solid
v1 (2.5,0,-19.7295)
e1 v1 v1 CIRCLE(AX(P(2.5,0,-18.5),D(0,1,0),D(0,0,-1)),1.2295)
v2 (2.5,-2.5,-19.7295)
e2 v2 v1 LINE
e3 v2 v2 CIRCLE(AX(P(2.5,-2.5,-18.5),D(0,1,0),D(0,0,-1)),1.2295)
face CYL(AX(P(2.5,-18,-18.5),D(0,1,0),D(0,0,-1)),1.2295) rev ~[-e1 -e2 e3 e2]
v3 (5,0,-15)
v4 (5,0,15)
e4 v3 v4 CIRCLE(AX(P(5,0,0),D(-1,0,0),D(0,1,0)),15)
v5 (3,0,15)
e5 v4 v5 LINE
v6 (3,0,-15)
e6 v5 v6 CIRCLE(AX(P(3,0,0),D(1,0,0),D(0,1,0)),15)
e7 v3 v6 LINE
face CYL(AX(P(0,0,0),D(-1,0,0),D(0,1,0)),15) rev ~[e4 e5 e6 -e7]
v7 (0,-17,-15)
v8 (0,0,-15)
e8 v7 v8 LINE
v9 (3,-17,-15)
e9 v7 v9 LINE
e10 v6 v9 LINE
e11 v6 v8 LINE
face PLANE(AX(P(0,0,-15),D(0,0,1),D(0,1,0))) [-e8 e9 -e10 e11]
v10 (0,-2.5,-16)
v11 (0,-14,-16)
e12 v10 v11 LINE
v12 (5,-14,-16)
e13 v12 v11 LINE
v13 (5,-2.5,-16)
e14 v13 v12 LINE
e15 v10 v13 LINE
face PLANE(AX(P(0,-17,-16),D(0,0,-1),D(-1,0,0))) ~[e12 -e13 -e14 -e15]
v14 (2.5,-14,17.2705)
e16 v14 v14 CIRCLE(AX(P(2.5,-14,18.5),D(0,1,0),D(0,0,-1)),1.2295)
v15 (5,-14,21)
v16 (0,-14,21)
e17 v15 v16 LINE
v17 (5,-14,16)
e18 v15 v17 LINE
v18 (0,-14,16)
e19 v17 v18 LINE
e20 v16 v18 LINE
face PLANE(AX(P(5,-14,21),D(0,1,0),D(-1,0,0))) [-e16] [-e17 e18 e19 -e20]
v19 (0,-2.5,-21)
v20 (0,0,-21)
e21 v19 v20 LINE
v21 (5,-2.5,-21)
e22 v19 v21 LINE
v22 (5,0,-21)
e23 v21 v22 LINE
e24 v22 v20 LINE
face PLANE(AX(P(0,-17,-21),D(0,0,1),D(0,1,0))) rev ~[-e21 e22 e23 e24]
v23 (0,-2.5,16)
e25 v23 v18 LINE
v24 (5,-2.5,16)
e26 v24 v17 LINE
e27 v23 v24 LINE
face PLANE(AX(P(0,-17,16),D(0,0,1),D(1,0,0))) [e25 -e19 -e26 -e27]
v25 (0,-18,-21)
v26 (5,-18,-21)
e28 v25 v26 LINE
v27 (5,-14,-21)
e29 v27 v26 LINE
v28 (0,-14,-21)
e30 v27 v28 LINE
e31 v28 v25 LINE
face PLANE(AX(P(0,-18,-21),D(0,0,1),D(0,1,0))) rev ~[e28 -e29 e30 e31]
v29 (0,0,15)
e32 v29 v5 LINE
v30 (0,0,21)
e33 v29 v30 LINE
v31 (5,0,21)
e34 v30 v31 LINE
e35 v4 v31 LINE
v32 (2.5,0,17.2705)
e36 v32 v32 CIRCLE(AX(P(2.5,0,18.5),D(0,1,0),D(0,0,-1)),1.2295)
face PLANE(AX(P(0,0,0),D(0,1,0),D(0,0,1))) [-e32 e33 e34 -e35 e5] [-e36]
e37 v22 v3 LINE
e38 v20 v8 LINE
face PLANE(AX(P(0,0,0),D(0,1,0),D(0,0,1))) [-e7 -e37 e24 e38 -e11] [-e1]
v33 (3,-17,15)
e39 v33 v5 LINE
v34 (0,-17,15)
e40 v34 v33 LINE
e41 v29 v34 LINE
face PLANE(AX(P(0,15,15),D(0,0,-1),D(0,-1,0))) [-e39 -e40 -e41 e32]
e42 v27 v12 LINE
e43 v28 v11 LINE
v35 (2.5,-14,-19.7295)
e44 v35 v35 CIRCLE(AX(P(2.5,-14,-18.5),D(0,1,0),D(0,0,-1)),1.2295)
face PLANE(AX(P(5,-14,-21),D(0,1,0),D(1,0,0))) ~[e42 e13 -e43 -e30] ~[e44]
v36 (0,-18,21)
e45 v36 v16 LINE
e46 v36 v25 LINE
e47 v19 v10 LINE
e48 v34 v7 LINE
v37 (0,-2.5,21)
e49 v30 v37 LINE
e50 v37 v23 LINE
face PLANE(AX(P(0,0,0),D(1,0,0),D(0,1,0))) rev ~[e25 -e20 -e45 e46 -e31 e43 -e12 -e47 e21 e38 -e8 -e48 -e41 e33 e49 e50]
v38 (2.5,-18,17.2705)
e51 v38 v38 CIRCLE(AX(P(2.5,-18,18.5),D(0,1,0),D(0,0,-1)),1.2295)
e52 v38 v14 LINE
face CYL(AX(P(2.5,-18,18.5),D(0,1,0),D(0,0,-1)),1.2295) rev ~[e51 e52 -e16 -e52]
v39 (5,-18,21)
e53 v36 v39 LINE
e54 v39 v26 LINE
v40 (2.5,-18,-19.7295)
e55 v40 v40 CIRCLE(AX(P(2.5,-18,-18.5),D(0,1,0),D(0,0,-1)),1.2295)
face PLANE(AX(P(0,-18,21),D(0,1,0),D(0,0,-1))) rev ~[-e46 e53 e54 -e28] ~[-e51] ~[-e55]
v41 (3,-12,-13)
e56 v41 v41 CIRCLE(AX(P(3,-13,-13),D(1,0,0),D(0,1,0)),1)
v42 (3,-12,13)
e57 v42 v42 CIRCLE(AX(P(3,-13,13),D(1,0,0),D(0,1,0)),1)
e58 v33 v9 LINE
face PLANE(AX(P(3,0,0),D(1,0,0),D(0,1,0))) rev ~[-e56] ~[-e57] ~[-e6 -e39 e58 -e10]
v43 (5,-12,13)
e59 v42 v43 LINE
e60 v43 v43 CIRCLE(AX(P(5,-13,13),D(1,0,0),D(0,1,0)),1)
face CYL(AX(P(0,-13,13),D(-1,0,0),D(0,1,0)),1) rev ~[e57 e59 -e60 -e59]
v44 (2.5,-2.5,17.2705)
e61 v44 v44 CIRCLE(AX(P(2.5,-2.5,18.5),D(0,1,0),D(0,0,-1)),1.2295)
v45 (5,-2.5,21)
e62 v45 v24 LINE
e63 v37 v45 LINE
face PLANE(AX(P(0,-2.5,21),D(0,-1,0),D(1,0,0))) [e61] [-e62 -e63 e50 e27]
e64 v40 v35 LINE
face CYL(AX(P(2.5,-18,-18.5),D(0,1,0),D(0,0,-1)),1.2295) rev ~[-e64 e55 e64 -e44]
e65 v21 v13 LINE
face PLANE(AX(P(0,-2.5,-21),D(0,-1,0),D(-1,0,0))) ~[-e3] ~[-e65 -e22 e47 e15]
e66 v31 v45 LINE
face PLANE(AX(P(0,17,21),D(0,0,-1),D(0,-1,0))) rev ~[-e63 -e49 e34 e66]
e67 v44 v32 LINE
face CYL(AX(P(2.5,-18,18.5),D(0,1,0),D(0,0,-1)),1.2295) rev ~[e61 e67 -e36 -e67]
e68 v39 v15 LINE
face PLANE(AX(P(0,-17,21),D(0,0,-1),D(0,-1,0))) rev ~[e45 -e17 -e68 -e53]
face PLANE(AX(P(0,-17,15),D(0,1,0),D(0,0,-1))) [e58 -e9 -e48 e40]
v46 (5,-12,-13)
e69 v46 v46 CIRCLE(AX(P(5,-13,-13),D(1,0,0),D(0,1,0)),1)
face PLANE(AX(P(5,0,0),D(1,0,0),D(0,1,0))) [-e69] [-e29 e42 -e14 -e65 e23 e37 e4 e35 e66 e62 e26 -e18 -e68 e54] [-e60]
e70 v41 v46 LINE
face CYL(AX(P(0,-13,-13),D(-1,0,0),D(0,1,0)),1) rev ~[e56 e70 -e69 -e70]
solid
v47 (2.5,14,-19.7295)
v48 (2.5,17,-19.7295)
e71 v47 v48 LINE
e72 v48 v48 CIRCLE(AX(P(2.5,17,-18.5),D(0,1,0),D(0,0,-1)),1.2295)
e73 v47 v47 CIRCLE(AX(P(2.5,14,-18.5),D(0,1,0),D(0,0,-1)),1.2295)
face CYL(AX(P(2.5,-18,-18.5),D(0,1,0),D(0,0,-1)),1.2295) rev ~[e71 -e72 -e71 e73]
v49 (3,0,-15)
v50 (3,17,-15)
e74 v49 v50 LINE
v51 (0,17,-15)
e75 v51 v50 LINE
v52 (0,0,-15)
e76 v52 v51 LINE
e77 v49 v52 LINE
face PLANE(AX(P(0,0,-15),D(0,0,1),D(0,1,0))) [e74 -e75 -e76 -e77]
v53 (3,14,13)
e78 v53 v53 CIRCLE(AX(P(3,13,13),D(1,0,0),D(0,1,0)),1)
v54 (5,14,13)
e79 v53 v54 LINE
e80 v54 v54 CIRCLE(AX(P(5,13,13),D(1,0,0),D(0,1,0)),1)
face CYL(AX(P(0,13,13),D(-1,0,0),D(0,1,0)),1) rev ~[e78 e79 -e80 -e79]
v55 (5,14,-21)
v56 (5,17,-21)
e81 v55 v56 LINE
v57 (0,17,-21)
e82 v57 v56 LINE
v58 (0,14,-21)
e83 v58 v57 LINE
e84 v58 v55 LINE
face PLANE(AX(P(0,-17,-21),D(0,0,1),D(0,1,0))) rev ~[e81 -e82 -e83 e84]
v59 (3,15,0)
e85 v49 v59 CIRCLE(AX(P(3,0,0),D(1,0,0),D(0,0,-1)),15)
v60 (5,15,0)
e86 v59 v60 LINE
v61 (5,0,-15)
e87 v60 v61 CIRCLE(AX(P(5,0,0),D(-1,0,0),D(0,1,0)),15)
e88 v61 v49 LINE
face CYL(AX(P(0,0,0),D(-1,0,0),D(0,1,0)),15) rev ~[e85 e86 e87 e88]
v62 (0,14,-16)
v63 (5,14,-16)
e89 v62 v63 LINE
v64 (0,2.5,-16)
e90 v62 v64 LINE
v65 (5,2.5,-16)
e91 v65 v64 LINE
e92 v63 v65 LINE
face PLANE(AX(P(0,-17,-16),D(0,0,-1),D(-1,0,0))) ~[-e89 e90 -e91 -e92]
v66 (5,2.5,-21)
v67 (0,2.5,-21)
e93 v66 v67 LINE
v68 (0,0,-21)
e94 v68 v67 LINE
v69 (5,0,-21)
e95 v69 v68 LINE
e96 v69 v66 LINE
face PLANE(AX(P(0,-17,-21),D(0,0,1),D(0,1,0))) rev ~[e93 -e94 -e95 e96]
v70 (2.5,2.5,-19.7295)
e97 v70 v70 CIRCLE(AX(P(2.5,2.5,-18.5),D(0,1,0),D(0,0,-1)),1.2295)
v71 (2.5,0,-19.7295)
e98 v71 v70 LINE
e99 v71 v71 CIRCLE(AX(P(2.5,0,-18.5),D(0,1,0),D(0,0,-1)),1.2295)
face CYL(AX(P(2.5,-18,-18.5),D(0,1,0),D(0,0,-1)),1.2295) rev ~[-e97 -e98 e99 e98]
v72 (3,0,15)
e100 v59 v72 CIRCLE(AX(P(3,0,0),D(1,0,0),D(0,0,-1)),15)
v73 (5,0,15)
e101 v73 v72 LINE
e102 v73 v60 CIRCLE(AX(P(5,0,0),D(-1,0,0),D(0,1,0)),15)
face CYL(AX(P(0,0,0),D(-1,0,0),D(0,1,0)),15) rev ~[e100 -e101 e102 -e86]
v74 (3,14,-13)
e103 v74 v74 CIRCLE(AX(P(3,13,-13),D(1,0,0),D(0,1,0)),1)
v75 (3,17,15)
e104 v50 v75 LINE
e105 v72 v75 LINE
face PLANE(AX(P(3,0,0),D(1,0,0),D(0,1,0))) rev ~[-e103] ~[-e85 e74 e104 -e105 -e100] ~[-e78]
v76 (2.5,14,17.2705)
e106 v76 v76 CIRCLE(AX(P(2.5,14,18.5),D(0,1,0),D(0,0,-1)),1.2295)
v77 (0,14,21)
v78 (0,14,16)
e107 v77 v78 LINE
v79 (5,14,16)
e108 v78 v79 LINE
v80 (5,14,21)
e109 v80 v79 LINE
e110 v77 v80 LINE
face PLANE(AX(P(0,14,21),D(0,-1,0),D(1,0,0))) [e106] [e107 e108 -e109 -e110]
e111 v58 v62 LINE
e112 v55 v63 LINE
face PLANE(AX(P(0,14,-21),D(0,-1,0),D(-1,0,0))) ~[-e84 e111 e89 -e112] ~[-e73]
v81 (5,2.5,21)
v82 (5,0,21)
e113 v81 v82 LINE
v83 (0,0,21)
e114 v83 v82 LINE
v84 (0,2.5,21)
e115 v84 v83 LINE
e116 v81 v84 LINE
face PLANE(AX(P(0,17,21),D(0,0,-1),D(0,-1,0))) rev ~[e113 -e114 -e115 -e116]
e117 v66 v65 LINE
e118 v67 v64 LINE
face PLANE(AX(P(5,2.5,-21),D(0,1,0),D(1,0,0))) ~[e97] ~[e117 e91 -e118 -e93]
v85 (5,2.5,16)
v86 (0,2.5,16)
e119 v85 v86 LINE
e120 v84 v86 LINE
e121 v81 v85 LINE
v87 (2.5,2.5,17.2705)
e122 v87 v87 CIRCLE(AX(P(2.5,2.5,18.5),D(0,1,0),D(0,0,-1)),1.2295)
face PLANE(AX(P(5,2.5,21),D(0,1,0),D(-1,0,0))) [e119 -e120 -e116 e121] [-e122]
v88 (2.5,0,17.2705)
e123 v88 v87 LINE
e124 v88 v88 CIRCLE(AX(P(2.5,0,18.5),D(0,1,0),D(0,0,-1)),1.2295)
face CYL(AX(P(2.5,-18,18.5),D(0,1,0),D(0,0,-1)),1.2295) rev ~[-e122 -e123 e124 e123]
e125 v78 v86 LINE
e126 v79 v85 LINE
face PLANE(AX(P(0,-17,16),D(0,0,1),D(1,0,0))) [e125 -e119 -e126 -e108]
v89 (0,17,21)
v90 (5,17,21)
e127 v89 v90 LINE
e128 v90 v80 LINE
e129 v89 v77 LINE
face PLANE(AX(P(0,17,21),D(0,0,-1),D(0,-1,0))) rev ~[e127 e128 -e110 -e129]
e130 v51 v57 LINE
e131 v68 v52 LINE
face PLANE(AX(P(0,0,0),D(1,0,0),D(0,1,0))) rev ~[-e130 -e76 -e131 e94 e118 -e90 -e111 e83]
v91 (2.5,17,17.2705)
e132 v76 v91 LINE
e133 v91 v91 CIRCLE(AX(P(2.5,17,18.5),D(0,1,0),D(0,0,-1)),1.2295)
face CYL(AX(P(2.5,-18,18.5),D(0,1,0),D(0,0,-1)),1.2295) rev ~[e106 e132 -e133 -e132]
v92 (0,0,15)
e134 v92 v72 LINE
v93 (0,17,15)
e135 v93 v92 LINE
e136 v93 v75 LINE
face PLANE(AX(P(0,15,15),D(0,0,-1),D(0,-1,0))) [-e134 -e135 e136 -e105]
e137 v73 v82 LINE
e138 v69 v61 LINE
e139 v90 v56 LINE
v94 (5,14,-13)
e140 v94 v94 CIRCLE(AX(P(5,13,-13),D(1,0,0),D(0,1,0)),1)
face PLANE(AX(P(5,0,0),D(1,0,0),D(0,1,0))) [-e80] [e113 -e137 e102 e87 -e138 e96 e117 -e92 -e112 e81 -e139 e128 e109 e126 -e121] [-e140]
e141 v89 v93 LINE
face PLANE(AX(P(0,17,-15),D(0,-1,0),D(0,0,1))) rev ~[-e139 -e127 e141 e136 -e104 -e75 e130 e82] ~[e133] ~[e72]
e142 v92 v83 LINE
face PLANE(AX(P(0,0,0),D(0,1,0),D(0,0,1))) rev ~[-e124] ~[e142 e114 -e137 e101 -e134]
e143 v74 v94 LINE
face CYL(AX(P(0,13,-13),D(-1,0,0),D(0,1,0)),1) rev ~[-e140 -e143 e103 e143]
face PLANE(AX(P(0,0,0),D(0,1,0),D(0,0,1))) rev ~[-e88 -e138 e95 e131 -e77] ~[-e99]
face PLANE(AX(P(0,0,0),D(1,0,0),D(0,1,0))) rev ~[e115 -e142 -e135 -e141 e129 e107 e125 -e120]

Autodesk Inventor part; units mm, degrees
ref_plane "YZ Plane" through (0, 0, 0) normal (1, 0, 0) x (0, 1, 0)
ref_plane "XZ Plane" through (0, 0, 0) normal (0, 1, 0) x (-1, 0, 0)
ref_plane "XY Plane" through (0, 0, 0) normal (0, 0, 1) x (1, 0, 0)
sketch "Sketch1" plane through (0, 0, 0) normal (1, 0, 0) x (0, 1, 0)
  circle A0 centre (0, 0) radius 15
  line L0 (15, 15) -> (-15, 15)
  line L1 (-15, 15) -> (-15, -15) construction
  line L2 (-15, -15) -> (15, -15)
  line L3 (15, -15) -> (15, 15) construction
  line L4 (15, 15) -> (-15, -15) construction
  line L5 (-15, 15) -> (15, -15) construction
  line L6 (17, 21) -> (-17, 21)
  line L7 (-17, 21) -> (-17, -21)
  line L8 (-17, -21) -> (17, -21)
  line L9 (17, -21) -> (17, 21)
  line L10 (17, 21) -> (-17, -21) construction
  line L11 (-17, 21) -> (17, -21) construction
  circle A1 centre (13, -13) radius 1
  circle A2 centre (13, 13) radius 1
  circle A3 centre (-13, -13) radius 1
  circle A4 centre (-13, 13) radius 1
  line L12 (17, -15) -> (15, -15)
  line L13 (-15, -15) -> (-17, -15)
  line L14 (17, 15) -> (15, 15)
  line L15 (-15, 15) -> (-17, 15)
  line L16 (-17, 21) -> (-18, 21)
  line L17 (-18, 21) -> (-18, -21)
  line L18 (-18, -21) -> (-17, -21)
  line L19 (-17, -21) -> (-17, 21)
  point P0 (0, -15)
  point P1 (0, 15)
  dimension "d0" = 30
  dimension "d1" = 42
  dimension "d2" = 34
  dimension "d10" = 2
  dimension "d11" = 2
  dimension "d14" = 26
  dimension "d17" = 26
  dimension "d44" = 1
sketch "Sketch2" plane through (0, 0, 0) normal (0, 1, 0) x (-1, 0, 0)
  line L0 (190, 50) -> (-10, 50)
  line L1 (-10, 50) -> (-10, -50)
  line L2 (-10, -50) -> (190, -50)
  line L3 (190, -50) -> (190, 50)
  point P0 (0, 0)
  point P1 (-10, 0)
  dimension "d3" = 200
  dimension "d4" = 100
  dimension "d5" = 10
extrude "Extrusion1" add sketch "Sketch1" along normal blind 5 contours A0 | A0 L0 L14 L9 L12 L2 | L0 L15 L7 L6 L9 L14 | A0 L2 L13 L7 L15 L0 | L2 L12 L9 L8 L7 L13 | A1 | A2 | A3 | A4
extrude "Extrusion4" cut sketch "Sketch1" along normal blind 3 contours A0 L0 L14 L9 L12 L2 | A0 L2 L13 L7 L15 L0
extrude "Extrusion3" cut sketch "Sketch1" along normal blind 5 contours A0 | A1 | A2 | A3 | A4
sketch "Sketch3" plane through (0, -17, 21) normal (0, 0, 1) x (1, 0, 0)
  line L0 (0, 34) -> (0, 0) projected
  line L1 (0, 0) -> (5, 0) projected
  line L2 (5, 34) -> (5, 0) projected
  line L3 (0, 0) -> (0, 34) projected
  line L4 (5, 0) -> (5, 34) projected
  line L5 (0, 14.5) -> (5, 14.5)
  line L6 (5, 14.5) -> (5, 3)
  line L7 (5, 3) -> (0, 3)
  line L8 (0, 3) -> (0, 14.5)
  line L9 (0, 31) -> (5, 31)
  line L10 (5, 31) -> (5, 19.5)
  line L11 (5, 19.5) -> (0, 19.5)
  line L12 (0, 19.5) -> (0, 31)
  line L13 (0, 34) -> (5, 34) projected
  point P0 (0, 17)
  point P1 (0, 17)
  point P2 (0, 3)
  point P3 (5, 3)
  point P4 (0, 19.5)
  dimension "d26" = 3
  dimension "d27" = 5
  dimension "d29" = 2.5
  dimension "d43" = 3
extrude "Extrusion5" cut sketch "Sketch3" against normal blind 5 contours L9 L2 L11 L0 | L5 L2 L7 L0
mirror "Mirror1" about plane through (0, 0, 0) normal (0, 0, 1) of "Extrusion5"
extrude "Extrusion6" add sketch "Sketch1" along normal blind 5 contours L7 L18 L17 L16
sketch "Sketch5" plane through (0, -18, -21) normal (0, -1, 0) x (1, 0, 0)
  line L0 (0, 42) -> (5, 42) projected
  line L1 (0, 42) -> (0, 0) projected
  line L2 (0, 0) -> (5, 0) projected
  point P0 (0, 21)
  point P1 (2.5, 2.5)
  point P2 (2.5, 39.5)
  dimension "d54" = 2.5
  dimension "d55" = 2.5
  dimension "d56" = 2.5
  dimension "d57" = 2.5
hole "Hole2" at (2.5, -18, -18.5) at (2.5, -18, 18.5) direction (0, 1, 0) diameter 2.459 end through all thread size "M3x0.5" class "6H" standard "ISO Metric profile"
split body "Split1" result two bodies by plane through (0, 0, 0) normal (0, 1, 0) first body at (4.5, 16.3333, 0)
properties part number "Camera holder1"
